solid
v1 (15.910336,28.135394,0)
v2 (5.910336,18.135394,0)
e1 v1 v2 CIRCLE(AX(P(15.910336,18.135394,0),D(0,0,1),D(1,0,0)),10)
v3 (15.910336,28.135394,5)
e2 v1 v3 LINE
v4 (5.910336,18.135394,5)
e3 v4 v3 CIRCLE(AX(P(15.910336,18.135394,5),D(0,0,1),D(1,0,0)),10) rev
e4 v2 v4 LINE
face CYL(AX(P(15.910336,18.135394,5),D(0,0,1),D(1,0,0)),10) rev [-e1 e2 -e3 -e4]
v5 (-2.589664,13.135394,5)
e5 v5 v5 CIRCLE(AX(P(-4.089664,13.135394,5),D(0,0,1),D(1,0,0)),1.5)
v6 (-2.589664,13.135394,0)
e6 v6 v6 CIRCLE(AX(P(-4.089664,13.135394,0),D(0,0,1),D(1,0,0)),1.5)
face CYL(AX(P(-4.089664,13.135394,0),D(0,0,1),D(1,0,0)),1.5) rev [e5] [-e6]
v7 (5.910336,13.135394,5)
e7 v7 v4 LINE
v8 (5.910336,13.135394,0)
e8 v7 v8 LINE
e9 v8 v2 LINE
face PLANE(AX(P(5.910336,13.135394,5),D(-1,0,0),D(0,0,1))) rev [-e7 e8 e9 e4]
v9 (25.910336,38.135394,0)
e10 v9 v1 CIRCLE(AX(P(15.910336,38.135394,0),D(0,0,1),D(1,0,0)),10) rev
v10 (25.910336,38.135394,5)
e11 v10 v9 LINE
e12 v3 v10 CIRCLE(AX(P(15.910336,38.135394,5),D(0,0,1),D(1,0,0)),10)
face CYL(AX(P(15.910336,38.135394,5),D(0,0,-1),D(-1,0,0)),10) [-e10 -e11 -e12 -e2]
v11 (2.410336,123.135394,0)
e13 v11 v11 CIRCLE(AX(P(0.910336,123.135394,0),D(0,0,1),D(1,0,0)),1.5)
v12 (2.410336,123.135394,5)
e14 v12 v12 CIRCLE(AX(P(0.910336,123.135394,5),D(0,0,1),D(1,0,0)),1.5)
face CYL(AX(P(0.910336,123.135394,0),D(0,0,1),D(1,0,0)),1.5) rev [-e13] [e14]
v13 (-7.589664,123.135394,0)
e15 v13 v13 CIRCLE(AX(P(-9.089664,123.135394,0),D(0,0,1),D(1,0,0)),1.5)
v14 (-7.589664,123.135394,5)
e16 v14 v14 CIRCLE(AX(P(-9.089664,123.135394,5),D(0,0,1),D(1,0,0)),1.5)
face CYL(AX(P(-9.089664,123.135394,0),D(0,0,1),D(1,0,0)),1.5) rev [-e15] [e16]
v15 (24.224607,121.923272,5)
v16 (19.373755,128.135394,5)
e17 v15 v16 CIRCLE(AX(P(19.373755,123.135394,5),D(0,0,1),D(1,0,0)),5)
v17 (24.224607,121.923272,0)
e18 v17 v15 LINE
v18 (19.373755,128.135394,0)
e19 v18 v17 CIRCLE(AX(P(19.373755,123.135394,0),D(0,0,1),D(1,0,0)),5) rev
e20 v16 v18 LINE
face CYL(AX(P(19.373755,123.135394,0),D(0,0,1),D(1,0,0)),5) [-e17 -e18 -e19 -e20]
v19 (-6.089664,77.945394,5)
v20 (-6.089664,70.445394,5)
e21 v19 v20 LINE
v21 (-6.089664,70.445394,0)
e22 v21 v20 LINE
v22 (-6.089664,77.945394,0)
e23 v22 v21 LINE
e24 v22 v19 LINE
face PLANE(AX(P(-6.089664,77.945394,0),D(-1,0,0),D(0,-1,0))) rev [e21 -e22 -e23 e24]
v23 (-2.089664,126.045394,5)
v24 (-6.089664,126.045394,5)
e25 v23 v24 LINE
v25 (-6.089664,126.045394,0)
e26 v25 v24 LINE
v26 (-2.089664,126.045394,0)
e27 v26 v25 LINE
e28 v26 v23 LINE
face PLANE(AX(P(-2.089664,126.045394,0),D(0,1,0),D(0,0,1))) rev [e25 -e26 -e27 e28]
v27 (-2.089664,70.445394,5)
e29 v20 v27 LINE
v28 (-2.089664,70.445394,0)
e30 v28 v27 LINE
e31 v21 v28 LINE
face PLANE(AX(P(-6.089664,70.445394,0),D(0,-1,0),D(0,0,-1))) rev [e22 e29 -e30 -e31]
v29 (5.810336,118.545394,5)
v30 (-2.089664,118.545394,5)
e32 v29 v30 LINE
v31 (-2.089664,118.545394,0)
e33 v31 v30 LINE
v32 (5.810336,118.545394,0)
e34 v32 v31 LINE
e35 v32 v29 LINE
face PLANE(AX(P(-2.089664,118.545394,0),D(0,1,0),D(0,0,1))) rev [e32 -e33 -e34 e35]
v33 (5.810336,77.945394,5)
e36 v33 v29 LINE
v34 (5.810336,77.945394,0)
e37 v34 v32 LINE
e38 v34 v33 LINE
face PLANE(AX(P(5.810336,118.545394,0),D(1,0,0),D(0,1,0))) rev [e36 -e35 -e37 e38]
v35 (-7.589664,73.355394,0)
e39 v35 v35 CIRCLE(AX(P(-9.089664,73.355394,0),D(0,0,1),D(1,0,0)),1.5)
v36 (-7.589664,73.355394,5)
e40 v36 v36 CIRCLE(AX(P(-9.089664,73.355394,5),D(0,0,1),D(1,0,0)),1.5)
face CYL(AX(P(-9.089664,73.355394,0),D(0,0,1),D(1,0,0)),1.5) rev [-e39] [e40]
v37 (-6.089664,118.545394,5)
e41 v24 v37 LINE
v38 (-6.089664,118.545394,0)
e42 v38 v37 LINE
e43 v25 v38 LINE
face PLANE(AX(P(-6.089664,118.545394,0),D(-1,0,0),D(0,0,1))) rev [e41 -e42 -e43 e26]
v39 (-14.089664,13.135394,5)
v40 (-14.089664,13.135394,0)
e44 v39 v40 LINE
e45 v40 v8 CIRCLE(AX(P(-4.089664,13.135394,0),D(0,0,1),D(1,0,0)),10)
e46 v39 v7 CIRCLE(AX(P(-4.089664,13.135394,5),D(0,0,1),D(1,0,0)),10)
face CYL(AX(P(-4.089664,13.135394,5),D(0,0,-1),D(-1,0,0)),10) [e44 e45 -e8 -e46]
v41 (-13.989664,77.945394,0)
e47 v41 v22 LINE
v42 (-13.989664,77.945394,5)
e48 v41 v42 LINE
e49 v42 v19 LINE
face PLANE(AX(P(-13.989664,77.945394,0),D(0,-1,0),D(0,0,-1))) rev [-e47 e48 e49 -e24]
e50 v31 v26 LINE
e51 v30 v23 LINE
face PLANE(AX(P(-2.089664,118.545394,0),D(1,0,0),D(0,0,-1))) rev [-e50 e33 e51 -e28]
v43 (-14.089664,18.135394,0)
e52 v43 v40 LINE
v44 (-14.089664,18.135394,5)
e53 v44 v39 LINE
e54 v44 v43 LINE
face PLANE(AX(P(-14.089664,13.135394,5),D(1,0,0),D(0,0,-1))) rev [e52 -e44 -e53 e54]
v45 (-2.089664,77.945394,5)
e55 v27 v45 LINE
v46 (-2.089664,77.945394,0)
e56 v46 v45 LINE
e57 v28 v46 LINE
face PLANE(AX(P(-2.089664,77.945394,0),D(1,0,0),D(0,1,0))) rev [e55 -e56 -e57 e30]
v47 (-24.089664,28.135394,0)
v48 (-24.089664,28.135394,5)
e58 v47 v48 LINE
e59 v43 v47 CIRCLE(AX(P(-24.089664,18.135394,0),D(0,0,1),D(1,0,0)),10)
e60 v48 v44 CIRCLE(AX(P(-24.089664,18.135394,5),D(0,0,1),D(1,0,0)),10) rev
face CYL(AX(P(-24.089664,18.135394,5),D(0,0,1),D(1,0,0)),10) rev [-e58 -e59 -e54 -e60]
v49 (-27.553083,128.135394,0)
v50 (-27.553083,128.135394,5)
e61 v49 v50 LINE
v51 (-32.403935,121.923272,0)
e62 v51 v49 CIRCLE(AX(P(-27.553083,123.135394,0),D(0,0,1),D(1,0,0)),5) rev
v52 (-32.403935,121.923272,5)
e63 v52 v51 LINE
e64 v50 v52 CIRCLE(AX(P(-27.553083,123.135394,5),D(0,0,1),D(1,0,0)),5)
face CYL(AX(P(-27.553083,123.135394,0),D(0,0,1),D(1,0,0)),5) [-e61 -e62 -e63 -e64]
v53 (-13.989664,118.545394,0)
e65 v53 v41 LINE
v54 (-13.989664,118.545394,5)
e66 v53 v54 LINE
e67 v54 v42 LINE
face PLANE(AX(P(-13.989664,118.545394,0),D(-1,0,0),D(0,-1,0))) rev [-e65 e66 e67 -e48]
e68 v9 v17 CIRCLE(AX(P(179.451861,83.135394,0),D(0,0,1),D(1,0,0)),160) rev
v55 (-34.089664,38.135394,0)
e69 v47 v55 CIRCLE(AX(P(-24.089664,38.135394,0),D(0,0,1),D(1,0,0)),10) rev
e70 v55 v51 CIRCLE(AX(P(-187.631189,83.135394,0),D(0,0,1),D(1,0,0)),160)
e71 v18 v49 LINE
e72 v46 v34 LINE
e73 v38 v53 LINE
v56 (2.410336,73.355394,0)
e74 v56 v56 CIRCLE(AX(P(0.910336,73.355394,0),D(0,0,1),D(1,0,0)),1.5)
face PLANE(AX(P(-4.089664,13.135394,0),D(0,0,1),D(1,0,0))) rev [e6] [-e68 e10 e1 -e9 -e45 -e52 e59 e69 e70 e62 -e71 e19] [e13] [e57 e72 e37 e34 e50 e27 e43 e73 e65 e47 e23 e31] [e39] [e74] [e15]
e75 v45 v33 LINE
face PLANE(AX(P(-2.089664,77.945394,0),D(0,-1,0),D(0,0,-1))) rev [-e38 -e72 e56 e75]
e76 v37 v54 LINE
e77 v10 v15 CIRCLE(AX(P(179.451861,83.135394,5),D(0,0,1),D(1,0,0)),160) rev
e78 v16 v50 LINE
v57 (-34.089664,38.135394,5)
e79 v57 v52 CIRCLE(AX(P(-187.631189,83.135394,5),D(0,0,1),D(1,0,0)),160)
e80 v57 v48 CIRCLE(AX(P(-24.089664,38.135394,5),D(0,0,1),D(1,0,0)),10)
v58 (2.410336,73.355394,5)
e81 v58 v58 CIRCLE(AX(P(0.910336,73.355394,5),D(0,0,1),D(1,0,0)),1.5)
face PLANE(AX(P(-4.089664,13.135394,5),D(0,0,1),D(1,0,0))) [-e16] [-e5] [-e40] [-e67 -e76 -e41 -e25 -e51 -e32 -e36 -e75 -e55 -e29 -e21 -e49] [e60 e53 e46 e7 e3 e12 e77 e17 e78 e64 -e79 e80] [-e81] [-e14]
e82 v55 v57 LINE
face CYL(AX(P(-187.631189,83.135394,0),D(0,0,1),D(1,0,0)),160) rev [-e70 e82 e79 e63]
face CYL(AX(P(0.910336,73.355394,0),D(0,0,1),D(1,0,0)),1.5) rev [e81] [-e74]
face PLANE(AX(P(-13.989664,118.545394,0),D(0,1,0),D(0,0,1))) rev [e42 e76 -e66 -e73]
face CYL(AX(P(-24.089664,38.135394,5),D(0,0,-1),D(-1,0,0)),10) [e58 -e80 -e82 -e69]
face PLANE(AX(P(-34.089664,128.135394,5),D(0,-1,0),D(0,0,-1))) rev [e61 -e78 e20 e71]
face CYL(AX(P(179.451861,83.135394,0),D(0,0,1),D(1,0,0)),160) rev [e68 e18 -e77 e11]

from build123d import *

# Parameters (mm, degrees)
RESSALTO_EXTRUS_O1_DEPTH = 5
ESBO_O2_R                = 1.5
CORTE_EXTRUS_O1_DEPTH    = 5
FILETE1_R                = 10
CORTE_EXTRUS_O2_DEPTH    = 5
ESBO_O4_R                = 1.5
CORTE_EXTRUS_O3_DEPTH    = 5
FILETE2_R                = 5
CORTE_EXTRUS_O4_DEPTH    = 5


with BuildPart() as part:
    # Esboço1 → Ressalto-extrusão1 (new body)
    with BuildSketch(Plane.XY):
        with BuildLine():
            Line((-14.089663978, 13.135393664), (-14.089663978, 28.135393664))
            Line((-14.089663978, 28.135393664), (-34.089663978, 28.135393664))
            Line((-34.089663978, 28.135393664), (-34.089663978, 128.135393664))
            Line((-34.089663978, 128.135393664), (25.910336022, 128.135393664))
            Line((25.910336022, 128.135393664), (25.910336022, 28.135393664))
            Line((25.910336022, 28.135393664), (5.910336022, 28.135393664))
            Line((5.910336022, 28.135393664), (5.910336022, 13.135393664))
            ThreePointArc((5.910336022, 13.135393664), (-4.089663978, 3.135393664), (-14.089663978, 13.135393664))
        make_face()
    extrude(amount=RESSALTO_EXTRUS_O1_DEPTH)

    # Esboço2 → Corte-extrusão1 (cut)
    with BuildSketch(Plane.XY.offset(5)):
        with Locations((-4.089663978, 13.135393664)):
            Circle(ESBO_O2_R)
    extrude(amount=-CORTE_EXTRUS_O1_DEPTH, mode=Mode.SUBTRACT)

    # Filete1
    filete1_edges = [part.edges().sort_by_distance(p)[0] for p in [
        (5.910336022, 28.135393664, 2.5),
        (-14.089663978, 28.135393664, 2.5),
    ]]
    fillet(filete1_edges, radius=FILETE1_R)
    filete1_2_edges = [part.edges().sort_by_distance(p)[0] for p in [
        (25.910336022, 28.135393664, 2.5),
        (-34.089663978, 28.135393664, 2.5),
    ]]
    fillet(filete1_2_edges, radius=FILETE1_R - 0.0001)  # a hair under: the kernel refuses the full size

    # Esboço3 → Corte-extrusão2 (cut)
    with BuildSketch(Plane.XY.offset(5)):
        with BuildLine():
            ThreePointArc((-34.089663978, 38.135393664), (-27.631189305, 83.135393664), (-34.089663978, 128.135393664))
            Line((-34.089663978, 128.135393664), (-34.089663978, 38.135393664))
        make_face()
        with BuildLine():
            ThreePointArc((25.910336022, 38.135393664), (19.45186135, 83.135393664), (25.910336022, 128.135393664))
            Line((25.910336022, 128.135393664), (25.910336022, 38.135393664))
        make_face()
    extrude(amount=-CORTE_EXTRUS_O2_DEPTH, mode=Mode.SUBTRACT)

    # Esboço4 → Corte-extrusão3 (cut)
    with BuildSketch(Plane.XY.offset(5)):
        with Locations((-9.089663978, 123.135393664)):
            Circle(ESBO_O4_R)
        with Locations((0.910336022, 123.135393664)):
            Circle(ESBO_O4_R)
        with Locations((-9.089663978, 73.355393664)):
            Circle(ESBO_O4_R)
        with Locations((0.910336022, 73.355393664)):
            Circle(ESBO_O4_R)
    extrude(amount=-CORTE_EXTRUS_O3_DEPTH, mode=Mode.SUBTRACT)

    # Filete2
    filete2_edges = [part.edges().sort_by_distance(p)[0] for p in [
        (-34.089663978, 128.135393664, 2.5),
        (25.910336022, 128.135393664, 2.5),
    ]]
    fillet(filete2_edges, radius=FILETE2_R)

    # Esboço5 → Corte-extrusão4 (cut)
    with BuildSketch(Plane.XY.offset(5)):
        Polygon((-13.989663978, 118.545393664), (-6.089663978, 118.545393664), (-6.089663978, 126.045393664), (-2.089663978, 126.045393664), (-2.089663978, 118.545393664), (5.810336022, 118.545393664), (5.810336022, 77.945393664), (-2.089663978, 77.945393664), (-2.089663978, 70.445393664), (-6.089663978, 70.445393664), (-6.089663978, 77.945393664), (-13.989663978, 77.945393664), align=None)
    extrude(amount=-CORTE_EXTRUS_O4_DEPTH, mode=Mode.SUBTRACT)


solid = part.part
